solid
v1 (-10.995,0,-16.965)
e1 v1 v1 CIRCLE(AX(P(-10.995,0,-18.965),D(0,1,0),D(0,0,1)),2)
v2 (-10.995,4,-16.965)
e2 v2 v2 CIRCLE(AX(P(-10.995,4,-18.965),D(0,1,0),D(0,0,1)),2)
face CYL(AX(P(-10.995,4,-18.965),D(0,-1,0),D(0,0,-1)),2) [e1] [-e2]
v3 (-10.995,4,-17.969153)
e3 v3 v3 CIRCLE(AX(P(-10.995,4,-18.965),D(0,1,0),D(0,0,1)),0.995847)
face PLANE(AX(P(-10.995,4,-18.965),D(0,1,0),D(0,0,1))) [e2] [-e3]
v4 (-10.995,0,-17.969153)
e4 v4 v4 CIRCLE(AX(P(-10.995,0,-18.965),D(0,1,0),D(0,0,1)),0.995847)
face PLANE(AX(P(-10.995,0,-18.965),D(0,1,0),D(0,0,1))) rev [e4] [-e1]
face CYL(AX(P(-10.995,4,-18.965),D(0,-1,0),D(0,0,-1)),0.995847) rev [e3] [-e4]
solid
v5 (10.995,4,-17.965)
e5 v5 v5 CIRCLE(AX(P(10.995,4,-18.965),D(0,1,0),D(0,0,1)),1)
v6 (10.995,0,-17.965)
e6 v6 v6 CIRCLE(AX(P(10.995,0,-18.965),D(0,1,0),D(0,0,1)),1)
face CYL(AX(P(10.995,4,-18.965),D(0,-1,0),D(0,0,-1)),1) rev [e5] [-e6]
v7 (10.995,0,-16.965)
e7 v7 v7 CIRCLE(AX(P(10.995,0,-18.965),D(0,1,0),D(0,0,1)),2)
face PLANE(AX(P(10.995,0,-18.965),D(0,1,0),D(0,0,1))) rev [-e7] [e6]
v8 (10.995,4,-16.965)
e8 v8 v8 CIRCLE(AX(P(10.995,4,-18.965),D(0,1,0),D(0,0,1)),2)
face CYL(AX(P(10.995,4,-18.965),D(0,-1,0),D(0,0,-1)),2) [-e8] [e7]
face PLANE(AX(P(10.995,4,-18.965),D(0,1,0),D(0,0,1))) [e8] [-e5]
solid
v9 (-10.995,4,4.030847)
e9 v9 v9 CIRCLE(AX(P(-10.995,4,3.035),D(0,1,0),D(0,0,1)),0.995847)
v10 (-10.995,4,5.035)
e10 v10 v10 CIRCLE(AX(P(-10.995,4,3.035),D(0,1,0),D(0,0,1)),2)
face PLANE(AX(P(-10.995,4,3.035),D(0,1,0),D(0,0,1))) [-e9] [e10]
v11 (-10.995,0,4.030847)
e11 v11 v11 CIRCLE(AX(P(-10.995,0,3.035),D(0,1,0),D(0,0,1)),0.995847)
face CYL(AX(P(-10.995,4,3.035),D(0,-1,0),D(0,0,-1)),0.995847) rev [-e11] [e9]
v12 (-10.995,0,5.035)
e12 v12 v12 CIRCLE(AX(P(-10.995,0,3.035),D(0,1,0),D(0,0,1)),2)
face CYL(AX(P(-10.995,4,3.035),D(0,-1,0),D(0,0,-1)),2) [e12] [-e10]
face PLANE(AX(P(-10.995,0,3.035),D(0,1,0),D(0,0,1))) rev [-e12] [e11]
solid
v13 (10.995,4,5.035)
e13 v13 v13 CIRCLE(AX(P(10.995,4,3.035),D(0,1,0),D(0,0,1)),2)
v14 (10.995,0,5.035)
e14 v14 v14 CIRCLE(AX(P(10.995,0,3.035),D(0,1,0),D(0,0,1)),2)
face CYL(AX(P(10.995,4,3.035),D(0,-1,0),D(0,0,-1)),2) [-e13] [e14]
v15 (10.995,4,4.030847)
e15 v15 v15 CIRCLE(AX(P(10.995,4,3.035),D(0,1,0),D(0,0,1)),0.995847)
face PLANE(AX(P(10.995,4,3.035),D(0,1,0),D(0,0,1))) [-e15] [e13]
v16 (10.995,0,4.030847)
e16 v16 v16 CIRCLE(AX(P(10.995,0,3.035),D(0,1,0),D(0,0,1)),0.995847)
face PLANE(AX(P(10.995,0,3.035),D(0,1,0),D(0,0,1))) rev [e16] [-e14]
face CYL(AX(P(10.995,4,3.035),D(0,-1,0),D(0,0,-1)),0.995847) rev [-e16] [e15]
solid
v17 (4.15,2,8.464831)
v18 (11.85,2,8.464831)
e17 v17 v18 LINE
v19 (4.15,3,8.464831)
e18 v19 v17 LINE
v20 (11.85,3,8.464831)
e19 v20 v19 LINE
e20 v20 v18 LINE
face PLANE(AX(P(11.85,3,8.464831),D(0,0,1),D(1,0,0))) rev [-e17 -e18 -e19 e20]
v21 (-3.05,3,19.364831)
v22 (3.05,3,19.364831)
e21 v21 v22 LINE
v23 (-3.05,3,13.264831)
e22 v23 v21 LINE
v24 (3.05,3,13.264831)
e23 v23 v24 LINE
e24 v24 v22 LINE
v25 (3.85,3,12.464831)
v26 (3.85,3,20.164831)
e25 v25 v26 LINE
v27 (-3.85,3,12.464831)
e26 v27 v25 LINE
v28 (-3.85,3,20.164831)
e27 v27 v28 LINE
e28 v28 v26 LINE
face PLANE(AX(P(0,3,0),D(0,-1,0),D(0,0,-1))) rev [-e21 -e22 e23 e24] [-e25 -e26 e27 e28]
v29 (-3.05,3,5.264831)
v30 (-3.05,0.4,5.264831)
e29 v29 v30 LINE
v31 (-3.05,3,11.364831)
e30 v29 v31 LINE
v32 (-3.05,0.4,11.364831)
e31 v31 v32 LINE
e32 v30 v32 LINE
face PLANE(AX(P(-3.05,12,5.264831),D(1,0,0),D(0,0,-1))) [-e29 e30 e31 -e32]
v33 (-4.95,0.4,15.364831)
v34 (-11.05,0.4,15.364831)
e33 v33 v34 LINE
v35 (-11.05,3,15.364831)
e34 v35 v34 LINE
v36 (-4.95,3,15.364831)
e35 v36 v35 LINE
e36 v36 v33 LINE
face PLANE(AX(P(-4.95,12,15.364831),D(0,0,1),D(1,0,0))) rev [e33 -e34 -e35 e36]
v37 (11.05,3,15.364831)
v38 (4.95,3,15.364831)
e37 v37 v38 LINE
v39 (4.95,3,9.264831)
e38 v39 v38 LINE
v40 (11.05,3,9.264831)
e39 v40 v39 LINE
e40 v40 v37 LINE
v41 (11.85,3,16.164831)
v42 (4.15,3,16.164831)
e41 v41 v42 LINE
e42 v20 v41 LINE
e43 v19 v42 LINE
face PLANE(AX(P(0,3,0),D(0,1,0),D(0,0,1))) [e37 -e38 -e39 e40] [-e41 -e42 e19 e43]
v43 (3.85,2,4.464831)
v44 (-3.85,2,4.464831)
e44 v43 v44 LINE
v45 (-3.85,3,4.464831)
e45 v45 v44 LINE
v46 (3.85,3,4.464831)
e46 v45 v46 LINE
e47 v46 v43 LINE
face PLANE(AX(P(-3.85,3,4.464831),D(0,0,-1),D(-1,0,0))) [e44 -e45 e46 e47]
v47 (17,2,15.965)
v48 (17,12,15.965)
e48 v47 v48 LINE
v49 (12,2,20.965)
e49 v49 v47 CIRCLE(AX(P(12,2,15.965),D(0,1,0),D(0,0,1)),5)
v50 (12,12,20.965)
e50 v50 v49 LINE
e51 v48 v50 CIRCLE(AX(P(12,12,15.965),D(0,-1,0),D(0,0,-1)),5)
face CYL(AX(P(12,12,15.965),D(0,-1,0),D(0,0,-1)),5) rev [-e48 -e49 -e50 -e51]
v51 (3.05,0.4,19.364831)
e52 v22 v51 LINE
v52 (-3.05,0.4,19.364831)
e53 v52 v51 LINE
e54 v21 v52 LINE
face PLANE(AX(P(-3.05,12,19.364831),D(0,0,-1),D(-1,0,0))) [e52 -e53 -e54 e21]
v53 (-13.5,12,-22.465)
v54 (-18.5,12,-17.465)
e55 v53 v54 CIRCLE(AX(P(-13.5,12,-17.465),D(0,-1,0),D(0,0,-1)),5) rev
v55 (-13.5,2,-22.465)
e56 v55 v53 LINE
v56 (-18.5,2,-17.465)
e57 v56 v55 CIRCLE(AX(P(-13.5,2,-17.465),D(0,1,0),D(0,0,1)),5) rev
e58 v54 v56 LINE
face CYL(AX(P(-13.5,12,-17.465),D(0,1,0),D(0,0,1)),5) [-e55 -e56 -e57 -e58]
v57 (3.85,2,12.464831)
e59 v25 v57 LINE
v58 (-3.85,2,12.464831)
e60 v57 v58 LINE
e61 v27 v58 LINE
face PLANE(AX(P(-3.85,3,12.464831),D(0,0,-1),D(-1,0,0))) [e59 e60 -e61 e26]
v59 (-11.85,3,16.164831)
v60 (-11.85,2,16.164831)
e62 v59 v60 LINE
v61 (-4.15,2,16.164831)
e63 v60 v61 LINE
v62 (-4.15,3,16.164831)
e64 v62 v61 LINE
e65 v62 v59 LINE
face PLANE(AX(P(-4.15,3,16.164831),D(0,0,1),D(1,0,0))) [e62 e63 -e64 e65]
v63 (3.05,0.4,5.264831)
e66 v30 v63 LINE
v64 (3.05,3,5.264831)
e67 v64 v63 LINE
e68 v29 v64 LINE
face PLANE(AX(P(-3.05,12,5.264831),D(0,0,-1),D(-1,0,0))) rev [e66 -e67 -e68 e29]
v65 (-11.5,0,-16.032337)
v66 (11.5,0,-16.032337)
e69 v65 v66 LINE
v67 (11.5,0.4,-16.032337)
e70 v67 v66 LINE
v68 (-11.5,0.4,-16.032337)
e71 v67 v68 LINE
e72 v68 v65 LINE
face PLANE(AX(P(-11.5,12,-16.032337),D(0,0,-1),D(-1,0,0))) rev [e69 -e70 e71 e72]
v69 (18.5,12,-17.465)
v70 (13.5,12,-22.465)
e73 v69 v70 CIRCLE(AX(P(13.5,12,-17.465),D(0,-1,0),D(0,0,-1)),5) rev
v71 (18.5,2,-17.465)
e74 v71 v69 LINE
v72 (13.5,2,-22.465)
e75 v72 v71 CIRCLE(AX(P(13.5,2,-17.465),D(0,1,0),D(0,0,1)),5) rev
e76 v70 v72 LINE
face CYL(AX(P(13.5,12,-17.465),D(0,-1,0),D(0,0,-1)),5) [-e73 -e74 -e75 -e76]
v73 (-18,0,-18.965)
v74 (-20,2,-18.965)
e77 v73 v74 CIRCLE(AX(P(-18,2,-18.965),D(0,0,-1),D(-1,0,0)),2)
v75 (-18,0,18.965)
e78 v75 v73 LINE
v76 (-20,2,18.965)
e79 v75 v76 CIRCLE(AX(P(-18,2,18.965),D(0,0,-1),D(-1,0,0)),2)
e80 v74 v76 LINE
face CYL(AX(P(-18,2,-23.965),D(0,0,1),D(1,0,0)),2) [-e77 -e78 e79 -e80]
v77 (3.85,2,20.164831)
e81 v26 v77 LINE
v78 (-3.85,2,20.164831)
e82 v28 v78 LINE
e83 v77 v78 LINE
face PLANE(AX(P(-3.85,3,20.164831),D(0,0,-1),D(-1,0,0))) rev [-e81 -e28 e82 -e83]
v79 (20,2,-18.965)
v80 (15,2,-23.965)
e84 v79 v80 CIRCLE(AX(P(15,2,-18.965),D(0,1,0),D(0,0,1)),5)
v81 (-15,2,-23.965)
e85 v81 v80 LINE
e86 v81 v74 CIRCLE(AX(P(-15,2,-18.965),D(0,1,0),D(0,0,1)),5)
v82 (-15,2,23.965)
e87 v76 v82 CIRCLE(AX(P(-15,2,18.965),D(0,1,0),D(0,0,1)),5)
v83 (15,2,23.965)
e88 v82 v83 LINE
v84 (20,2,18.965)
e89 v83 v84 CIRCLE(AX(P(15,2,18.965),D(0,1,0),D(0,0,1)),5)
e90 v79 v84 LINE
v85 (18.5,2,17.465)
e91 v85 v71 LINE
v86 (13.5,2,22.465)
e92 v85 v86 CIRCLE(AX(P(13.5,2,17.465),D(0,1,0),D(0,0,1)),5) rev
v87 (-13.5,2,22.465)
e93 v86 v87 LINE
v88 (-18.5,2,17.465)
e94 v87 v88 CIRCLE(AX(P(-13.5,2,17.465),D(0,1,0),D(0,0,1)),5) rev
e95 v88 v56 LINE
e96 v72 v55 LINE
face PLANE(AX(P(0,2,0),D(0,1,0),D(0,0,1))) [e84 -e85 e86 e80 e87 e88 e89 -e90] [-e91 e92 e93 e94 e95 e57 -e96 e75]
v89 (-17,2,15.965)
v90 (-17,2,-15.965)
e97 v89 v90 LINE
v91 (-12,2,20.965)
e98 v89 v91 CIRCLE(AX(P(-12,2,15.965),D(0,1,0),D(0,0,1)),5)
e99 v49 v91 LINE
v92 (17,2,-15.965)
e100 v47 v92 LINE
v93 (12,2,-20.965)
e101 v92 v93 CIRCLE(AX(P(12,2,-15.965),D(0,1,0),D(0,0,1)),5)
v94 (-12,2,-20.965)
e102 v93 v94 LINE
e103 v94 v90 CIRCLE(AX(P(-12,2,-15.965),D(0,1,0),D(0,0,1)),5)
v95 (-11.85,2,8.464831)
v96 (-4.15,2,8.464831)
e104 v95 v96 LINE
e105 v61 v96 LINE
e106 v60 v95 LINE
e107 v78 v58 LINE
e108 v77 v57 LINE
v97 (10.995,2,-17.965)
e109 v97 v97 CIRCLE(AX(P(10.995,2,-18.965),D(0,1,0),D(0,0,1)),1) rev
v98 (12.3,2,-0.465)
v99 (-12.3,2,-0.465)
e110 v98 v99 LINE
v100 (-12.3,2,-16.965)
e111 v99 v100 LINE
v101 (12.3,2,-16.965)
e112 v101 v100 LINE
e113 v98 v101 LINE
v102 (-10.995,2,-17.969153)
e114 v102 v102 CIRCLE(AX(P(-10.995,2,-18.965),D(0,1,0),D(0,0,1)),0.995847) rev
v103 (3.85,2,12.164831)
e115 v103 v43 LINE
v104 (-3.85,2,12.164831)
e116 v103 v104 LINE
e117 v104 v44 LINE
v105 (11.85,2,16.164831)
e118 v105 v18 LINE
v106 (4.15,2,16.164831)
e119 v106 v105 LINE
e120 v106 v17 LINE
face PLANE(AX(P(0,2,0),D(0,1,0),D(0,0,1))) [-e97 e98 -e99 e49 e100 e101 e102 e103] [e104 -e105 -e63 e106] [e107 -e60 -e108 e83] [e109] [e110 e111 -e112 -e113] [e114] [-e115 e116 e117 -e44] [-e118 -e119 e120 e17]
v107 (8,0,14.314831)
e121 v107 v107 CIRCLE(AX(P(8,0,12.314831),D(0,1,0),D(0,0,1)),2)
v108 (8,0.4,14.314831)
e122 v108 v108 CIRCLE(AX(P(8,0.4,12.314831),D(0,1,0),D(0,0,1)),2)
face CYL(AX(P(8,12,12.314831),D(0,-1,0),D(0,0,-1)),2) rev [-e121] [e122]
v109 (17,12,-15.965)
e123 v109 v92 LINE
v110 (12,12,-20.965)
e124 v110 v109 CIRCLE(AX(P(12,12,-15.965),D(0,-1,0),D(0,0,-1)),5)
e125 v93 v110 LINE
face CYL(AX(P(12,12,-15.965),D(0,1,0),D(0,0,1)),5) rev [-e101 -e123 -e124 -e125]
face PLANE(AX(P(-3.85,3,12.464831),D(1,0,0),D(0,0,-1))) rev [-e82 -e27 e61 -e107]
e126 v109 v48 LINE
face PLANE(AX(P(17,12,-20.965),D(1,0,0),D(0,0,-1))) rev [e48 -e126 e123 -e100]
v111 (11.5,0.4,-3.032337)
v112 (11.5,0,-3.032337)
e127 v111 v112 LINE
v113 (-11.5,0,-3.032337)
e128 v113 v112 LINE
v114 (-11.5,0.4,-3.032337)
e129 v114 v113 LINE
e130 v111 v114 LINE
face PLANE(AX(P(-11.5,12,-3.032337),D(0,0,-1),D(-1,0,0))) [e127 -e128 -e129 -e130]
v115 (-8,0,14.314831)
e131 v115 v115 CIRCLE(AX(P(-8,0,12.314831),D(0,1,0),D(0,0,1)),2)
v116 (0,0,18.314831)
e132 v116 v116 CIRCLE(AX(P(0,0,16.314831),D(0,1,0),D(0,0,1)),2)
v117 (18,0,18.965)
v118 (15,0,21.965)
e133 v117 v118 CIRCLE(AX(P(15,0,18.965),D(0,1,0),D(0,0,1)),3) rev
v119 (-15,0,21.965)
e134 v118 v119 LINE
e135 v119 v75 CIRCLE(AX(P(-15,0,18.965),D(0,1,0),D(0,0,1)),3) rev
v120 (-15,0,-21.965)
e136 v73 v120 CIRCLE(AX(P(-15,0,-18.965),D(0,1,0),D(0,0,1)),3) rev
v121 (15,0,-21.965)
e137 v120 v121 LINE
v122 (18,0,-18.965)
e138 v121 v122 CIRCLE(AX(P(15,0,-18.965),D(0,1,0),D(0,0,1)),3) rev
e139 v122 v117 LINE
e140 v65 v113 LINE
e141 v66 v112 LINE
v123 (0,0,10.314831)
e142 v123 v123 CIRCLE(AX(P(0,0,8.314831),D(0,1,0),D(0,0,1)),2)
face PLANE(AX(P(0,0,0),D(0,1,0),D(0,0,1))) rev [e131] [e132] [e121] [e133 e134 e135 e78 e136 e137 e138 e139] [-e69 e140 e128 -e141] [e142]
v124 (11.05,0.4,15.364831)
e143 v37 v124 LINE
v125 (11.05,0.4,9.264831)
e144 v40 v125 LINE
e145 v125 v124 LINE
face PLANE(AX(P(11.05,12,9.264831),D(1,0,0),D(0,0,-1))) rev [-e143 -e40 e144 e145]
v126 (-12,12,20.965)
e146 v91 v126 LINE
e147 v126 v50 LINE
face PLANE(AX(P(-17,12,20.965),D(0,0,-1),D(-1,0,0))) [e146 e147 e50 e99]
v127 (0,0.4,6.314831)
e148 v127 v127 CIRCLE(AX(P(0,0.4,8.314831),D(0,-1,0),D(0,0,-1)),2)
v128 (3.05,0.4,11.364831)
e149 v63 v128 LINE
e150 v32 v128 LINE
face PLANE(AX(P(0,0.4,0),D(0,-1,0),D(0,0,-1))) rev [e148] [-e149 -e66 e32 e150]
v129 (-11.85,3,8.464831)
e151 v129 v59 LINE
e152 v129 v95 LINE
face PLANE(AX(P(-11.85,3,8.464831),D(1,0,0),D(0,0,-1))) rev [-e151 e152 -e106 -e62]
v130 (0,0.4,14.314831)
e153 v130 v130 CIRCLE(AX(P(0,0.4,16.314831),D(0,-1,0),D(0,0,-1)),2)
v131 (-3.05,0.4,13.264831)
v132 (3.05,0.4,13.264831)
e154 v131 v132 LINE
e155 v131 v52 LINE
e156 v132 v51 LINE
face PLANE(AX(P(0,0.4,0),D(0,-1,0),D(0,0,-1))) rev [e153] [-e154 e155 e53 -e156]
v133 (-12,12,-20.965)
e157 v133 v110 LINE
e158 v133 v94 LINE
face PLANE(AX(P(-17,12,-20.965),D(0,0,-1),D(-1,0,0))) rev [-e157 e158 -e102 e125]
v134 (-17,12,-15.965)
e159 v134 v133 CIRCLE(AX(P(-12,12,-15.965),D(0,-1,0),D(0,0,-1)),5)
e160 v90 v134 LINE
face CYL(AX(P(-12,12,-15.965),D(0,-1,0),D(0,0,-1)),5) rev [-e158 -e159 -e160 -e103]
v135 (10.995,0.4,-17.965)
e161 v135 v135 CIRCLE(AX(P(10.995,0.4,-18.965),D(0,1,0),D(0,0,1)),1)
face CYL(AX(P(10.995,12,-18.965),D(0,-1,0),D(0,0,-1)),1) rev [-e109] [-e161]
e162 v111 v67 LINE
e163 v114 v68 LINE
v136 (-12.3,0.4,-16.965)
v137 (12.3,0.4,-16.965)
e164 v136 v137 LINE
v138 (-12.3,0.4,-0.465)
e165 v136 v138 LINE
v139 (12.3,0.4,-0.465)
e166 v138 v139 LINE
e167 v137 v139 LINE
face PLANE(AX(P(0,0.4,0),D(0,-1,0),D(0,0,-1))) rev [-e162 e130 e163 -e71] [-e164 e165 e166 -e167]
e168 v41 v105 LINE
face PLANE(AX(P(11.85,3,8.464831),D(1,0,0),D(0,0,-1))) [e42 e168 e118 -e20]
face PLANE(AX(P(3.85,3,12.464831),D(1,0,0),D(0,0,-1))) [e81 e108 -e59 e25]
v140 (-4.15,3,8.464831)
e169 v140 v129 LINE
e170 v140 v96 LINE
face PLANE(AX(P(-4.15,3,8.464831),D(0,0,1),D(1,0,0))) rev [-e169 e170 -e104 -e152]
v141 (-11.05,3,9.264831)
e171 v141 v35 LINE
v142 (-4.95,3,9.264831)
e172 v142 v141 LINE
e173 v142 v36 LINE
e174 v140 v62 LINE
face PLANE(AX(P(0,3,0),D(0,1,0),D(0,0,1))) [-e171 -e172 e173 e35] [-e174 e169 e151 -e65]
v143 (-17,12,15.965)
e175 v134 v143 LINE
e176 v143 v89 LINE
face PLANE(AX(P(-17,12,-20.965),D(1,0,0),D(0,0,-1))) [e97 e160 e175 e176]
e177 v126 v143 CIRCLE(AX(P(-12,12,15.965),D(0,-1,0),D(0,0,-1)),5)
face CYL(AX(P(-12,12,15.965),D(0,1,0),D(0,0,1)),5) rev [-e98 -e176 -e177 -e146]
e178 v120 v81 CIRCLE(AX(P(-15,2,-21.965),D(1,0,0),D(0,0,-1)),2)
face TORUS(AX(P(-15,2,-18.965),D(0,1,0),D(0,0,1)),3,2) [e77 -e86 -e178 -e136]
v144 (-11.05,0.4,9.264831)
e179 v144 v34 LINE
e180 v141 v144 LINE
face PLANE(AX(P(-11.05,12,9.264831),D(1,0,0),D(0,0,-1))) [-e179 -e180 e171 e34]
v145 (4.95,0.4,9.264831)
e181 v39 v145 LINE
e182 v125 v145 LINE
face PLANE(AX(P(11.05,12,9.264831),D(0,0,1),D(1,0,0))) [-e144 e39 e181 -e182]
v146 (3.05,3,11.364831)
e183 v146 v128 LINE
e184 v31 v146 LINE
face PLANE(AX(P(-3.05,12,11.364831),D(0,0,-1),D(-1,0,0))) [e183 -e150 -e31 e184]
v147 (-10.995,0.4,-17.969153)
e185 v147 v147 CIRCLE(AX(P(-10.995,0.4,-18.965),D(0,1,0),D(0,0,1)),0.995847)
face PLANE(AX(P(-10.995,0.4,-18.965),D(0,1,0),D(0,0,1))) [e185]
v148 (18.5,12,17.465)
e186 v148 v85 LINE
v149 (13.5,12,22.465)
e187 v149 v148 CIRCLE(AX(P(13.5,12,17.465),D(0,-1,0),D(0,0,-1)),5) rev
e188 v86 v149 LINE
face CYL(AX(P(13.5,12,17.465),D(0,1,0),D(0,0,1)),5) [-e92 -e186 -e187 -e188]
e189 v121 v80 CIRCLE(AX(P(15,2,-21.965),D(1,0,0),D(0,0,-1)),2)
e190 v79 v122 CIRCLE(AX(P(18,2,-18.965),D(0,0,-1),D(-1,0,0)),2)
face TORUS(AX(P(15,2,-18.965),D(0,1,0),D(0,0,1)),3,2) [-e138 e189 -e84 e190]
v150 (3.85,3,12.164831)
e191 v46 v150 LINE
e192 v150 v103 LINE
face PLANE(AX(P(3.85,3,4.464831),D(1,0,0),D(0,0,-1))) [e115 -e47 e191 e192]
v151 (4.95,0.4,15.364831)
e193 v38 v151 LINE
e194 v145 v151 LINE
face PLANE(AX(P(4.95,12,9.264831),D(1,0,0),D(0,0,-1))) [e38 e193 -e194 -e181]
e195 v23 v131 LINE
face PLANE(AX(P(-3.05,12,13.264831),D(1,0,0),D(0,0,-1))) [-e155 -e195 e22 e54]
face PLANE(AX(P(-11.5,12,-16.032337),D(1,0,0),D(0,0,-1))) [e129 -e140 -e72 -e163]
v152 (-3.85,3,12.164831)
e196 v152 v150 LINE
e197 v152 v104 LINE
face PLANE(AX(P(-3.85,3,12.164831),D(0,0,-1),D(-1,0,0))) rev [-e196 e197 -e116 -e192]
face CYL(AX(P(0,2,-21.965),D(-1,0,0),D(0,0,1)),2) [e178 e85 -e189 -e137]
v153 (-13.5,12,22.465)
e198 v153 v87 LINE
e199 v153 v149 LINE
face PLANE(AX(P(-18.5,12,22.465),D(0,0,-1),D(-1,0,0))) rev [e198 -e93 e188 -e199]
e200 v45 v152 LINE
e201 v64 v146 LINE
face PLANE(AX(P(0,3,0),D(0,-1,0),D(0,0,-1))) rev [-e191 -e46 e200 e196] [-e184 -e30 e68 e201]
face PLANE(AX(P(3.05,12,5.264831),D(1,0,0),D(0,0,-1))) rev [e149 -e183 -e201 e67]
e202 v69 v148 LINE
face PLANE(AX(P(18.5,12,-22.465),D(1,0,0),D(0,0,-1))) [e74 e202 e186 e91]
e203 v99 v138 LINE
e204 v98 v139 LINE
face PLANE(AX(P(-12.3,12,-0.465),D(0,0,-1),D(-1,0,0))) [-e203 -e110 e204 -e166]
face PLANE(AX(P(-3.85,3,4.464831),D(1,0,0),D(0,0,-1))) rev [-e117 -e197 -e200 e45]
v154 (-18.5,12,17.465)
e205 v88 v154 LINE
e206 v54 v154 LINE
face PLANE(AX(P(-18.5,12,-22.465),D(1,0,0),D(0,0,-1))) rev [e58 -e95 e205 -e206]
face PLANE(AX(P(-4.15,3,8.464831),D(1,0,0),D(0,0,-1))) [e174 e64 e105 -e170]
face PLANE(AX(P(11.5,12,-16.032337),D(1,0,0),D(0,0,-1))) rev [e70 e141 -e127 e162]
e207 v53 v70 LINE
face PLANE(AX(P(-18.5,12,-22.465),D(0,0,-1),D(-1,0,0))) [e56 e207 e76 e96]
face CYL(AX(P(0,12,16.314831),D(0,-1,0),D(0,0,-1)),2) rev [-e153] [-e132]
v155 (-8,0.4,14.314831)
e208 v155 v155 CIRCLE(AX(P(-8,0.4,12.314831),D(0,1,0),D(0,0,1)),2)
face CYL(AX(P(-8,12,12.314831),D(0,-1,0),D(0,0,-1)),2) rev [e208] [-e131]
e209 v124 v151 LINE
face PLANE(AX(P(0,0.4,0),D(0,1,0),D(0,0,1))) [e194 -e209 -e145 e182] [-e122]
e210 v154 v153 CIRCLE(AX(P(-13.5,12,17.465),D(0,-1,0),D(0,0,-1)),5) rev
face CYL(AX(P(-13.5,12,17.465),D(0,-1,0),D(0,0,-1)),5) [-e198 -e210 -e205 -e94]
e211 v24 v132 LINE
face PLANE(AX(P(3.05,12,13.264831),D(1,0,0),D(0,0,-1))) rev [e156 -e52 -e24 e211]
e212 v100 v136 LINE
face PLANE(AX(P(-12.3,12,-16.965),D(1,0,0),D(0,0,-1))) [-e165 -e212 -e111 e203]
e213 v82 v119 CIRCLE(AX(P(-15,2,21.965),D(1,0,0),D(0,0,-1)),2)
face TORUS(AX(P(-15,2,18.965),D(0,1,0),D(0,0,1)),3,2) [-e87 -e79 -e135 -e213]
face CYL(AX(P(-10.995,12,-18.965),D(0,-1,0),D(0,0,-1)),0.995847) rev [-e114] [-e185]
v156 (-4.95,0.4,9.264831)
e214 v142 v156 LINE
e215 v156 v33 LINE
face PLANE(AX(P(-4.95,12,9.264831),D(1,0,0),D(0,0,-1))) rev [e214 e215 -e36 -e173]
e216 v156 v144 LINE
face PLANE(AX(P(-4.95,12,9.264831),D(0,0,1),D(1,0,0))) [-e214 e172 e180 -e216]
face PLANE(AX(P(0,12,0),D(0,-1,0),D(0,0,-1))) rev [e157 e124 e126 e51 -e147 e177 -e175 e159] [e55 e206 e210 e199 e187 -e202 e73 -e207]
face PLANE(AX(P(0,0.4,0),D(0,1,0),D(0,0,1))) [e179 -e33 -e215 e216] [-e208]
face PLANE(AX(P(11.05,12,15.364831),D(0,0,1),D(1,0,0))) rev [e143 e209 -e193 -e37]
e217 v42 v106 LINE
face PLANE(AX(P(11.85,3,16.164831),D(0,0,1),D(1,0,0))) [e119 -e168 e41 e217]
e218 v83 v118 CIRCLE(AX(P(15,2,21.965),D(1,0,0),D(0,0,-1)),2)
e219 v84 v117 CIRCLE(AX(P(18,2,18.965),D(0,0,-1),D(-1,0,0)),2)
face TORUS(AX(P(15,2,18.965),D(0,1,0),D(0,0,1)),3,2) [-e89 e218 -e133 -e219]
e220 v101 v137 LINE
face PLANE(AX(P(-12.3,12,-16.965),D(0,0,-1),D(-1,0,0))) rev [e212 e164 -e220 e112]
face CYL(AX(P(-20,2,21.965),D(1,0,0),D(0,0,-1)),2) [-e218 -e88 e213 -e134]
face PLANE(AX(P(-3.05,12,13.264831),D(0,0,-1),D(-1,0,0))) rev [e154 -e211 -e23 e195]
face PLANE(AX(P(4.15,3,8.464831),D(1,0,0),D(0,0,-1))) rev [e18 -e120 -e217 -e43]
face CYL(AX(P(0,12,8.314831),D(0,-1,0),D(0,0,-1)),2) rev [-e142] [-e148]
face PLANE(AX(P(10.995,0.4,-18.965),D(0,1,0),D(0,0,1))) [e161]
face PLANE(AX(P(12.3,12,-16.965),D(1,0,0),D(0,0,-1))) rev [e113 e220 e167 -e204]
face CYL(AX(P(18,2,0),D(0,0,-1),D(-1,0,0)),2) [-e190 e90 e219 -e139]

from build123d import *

# Parameters (mm, degrees)
SCHIZZO1_W                     = 40
SCHIZZO1_H                     = 47.93
ESTRUSIONE_ESTRUSIONE1_DEPTH   = 2
SCHIZZO1_3_W                   = 37
SCHIZZO1_3_H                   = 44.93
SCHIZZO1_3_W_2                 = 34
SCHIZZO1_3_H_2                 = 41.93
ESTRUSIONE_ESTRUSIONE2_DEPTH   = 12
RACCORDO1_R                    = 5
RACCORDO2_R                    = 2
TAGLIO_ESTRUSIONE1_DEPTH       = 34.441310157
TAGLIO_ESTRUSIONE1_DEPTH_BACK  = 34.441310157
SCHIZZO2_R                     = 2
SCHIZZO2_W                     = 23
SCHIZZO2_H                     = 13
TAGLIO_ESTRUSIONE2_START       = 0.4
SCHIZZO3_R                     = 0.995847047
SCHIZZO3_R_2                   = 1
SCHIZZO3_W                     = 24.6
SCHIZZO3_H                     = 16.5
TAGLIO_ESTRUSIONE2_DEPTH       = 34.041310157
SCHIZZO3_3_R                   = 2
SCHIZZO3_3_R_2                 = 0.995847047
ESTRUSIONE_ESTRUSIONE3_DEPTH   = 4
SCHIZZO3_3_R_3                 = 1
ESTRUSIONE_ESTRUSIONE3_2_DEPTH = 4
ESTRUSIONE_ESTRUSIONE3_3_DEPTH = 4
ESTRUSIONE_ESTRUSIONE3_4_DEPTH = 4
TAGLIO_ESTRUSIONE3_START       = 0.4
SCHIZZO2_5_W                   = 6.1
SCHIZZO2_5_H                   = 6.1
TAGLIO_ESTRUSIONE3_DEPTH       = 34.041310157
SCHIZZO2_6_W                   = 7.7
SCHIZZO2_6_H                   = 7.7
SCHIZZO2_6_W_2                 = 6.1
SCHIZZO2_6_H_2                 = 6.1
ESTRUSIONE_ESTRUSIONE4_DEPTH   = 3


with BuildPart() as part:
    # Schizzo1 → Estrusione-Estrusione1 (new body)
    with BuildSketch(Plane(origin=(0, 0, 0), x_dir=(1, 0, 0), z_dir=(0, 1, 0))):
        Rectangle(SCHIZZO1_W, SCHIZZO1_H)
    extrude(amount=ESTRUSIONE_ESTRUSIONE1_DEPTH)

    # Schizzo1<3> → Estrusione-Estrusione2 (add)
    with BuildSketch(Plane(origin=(0, 0, 0), x_dir=(1, 0, 0), z_dir=(0, 1, 0))):
        Rectangle(SCHIZZO1_3_W, SCHIZZO1_3_H)
        Rectangle(SCHIZZO1_3_W_2, SCHIZZO1_3_H_2, mode=Mode.SUBTRACT)
    extrude(amount=ESTRUSIONE_ESTRUSIONE2_DEPTH)

    # Raccordo1
    raccordo1_edges = [part.edges().sort_by_distance(p)[0] for p in [
        (18.5, 7, -22.465),
        (-18.5, 7, -22.465),
        (-18.5, 7, 22.465),
        (18.5, 7, 22.465),
        (-17, 7, -20.965),
        (-17, 7, 20.965),
        (17, 7, 20.965),
        (17, 7, -20.965),
        (-20, 1, -23.965),
        (20, 1, -23.965),
        (20, 1, 23.965),
        (-20, 1, 23.965),
    ]]
    fillet(raccordo1_edges, radius=RACCORDO1_R)

    # Raccordo2
    raccordo2_edges = [part.edges().sort_by_distance(p)[0] for p in [
        (18.535533906, 0, -22.500533906),
        (0, 0, -23.965),
        (-18.535533906, 0, -22.500533906),
        (-20, 0, 0),
        (-18.535533906, 0, 22.500533906),
        (0, 0, 23.965),
        (18.535533906, 0, 22.500533906),
        (20, 0, 0),
    ]]
    fillet(raccordo2_edges, radius=RACCORDO2_R - 0.0001)  # a hair under: the kernel refuses the full size

    # Schizzo2 → Taglio-Estrusione1 (cut, two sides: drawn at the far end of the back side and taken through both)
    with BuildSketch(Plane(origin=(0, 0, 0), x_dir=(1, 0, 0), z_dir=(0, 1, 0)).offset(-TAGLIO_ESTRUSIONE1_DEPTH_BACK)):
        with Locations(Location((0, -8.314831285, 0), (0, 0, 270))):
            Circle(SCHIZZO2_R)
        with Locations(Location((8, -12.314831285, 0), (0, 0, 270))):
            Circle(SCHIZZO2_R)
        with Locations(Location((0, -16.314831285, 0), (0, 0, 270))):
            Circle(SCHIZZO2_R)
        with Locations(Location((-8, -12.314831285, 0), (0, 0, 270))):
            Circle(SCHIZZO2_R)
        with Locations((0, 9.532336944)):
            Rectangle(SCHIZZO2_W, SCHIZZO2_H)
    extrude(amount=TAGLIO_ESTRUSIONE1_DEPTH + TAGLIO_ESTRUSIONE1_DEPTH_BACK, mode=Mode.SUBTRACT)

    # Schizzo3 → Taglio-Estrusione2 (cut, through all)
    with BuildSketch(Plane(origin=(0, 0, 0), x_dir=(1, 0, 0), z_dir=(0, 1, 0)).offset(TAGLIO_ESTRUSIONE2_START)):
        with Locations(Location((-10.995, 18.965, 0), (0, 0, 270))):
            Circle(SCHIZZO3_R)
        with Locations(Location((10.995, 18.965, 0), (0, 0, 270))):
            Circle(SCHIZZO3_R_2)
        with Locations((0, 8.715)):
            Rectangle(SCHIZZO3_W, SCHIZZO3_H)
    extrude(amount=TAGLIO_ESTRUSIONE2_DEPTH, mode=Mode.SUBTRACT)

    # Schizzo2<5> → Taglio-Estrusione3 (cut, through all)
    with BuildSketch(Plane(origin=(0, 0, 0), x_dir=(1, 0, 0), z_dir=(0, 1, 0)).offset(TAGLIO_ESTRUSIONE3_START)):
        with Locations((0, -8.314831285)):
            Rectangle(SCHIZZO2_5_W, SCHIZZO2_5_H)
        with Locations((8, -12.314831285)):
            Rectangle(SCHIZZO2_5_W, SCHIZZO2_5_H)
        with Locations((0, -16.314831285)):
            Rectangle(SCHIZZO2_5_W, SCHIZZO2_5_H)
        with Locations((-8, -12.314831285)):
            Rectangle(SCHIZZO2_5_W, SCHIZZO2_5_H)
    extrude(amount=TAGLIO_ESTRUSIONE3_DEPTH, mode=Mode.SUBTRACT)

    # Schizzo2<6> → Estrusione-Estrusione4 (add)
    # profile 1 of 4: a face of its own
    with BuildSketch(Plane(origin=(0, 0, 0), x_dir=(1, 0, 0), z_dir=(0, 1, 0))):
        with Locations((0, -8.314831285)):
            Rectangle(SCHIZZO2_6_W, SCHIZZO2_6_H)
        with Locations((0, -8.314831285)):
            Rectangle(SCHIZZO2_6_W_2, SCHIZZO2_6_H_2, mode=Mode.SUBTRACT)
    # profile 2 of 4: a face of its own
    with BuildSketch(Plane(origin=(0, 0, 0), x_dir=(1, 0, 0), z_dir=(0, 1, 0))):
        with Locations((8, -12.314831285)):
            Rectangle(SCHIZZO2_6_W, SCHIZZO2_6_H)
        with Locations((8, -12.314831285)):
            Rectangle(SCHIZZO2_6_W_2, SCHIZZO2_6_H_2, mode=Mode.SUBTRACT)
    # profile 3 of 4: a face of its own
    with BuildSketch(Plane(origin=(0, 0, 0), x_dir=(1, 0, 0), z_dir=(0, 1, 0))):
        with Locations((0, -16.314831285)):
            Rectangle(SCHIZZO2_6_W, SCHIZZO2_6_H)
        with Locations((0, -16.314831285)):
            Rectangle(SCHIZZO2_6_W_2, SCHIZZO2_6_H_2, mode=Mode.SUBTRACT)
    # profile 4 of 4: a face of its own
    with BuildSketch(Plane(origin=(0, 0, 0), x_dir=(1, 0, 0), z_dir=(0, 1, 0))):
        with Locations((-8, -12.314831285)):
            Rectangle(SCHIZZO2_6_W, SCHIZZO2_6_H)
        with Locations((-8, -12.314831285)):
            Rectangle(SCHIZZO2_6_W_2, SCHIZZO2_6_H_2, mode=Mode.SUBTRACT)
    extrude(amount=ESTRUSIONE_ESTRUSIONE4_DEPTH)


with BuildPart() as body_2:
    # Schizzo3<3> → Estrusione-Estrusione3 (new body)
    with BuildSketch(Plane(origin=(0, 0, 0), x_dir=(1, 0, 0), z_dir=(0, 1, 0))):
        with Locations(Location((-10.995, 18.965, 0), (0, 0, 270))):
            Circle(SCHIZZO3_3_R)
        with Locations(Location((-10.995, 18.965, 0), (0, 0, 270))):
            Circle(SCHIZZO3_3_R_2, mode=Mode.SUBTRACT)
    extrude(amount=ESTRUSIONE_ESTRUSIONE3_DEPTH)


with BuildPart() as body_3:
    # Schizzo3<3> → Estrusione-Estrusione3 2 (new body)
    with BuildSketch(Plane(origin=(0, 0, 0), x_dir=(1, 0, 0), z_dir=(0, 1, 0))):
        with Locations(Location((10.995, 18.965, 0), (0, 0, 270))):
            Circle(SCHIZZO3_3_R)
        with Locations(Location((10.995, 18.965, 0), (0, 0, 270))):
            Circle(SCHIZZO3_3_R_3, mode=Mode.SUBTRACT)
    extrude(amount=ESTRUSIONE_ESTRUSIONE3_2_DEPTH)


with BuildPart() as body_4:
    # Schizzo3<3> → Estrusione-Estrusione3 3 (new body)
    with BuildSketch(Plane(origin=(0, 0, 0), x_dir=(1, 0, 0), z_dir=(0, 1, 0))):
        with Locations(Location((-10.995, -3.035, 0), (0, 0, 270))):
            Circle(SCHIZZO3_3_R)
        with Locations(Location((-10.995, -3.035, 0), (0, 0, 270))):
            Circle(SCHIZZO3_3_R_2, mode=Mode.SUBTRACT)
    extrude(amount=ESTRUSIONE_ESTRUSIONE3_3_DEPTH)


with BuildPart() as body_5:
    # Schizzo3<3> → Estrusione-Estrusione3 4 (new body)
    with BuildSketch(Plane(origin=(0, 0, 0), x_dir=(1, 0, 0), z_dir=(0, 1, 0))):
        with Locations(Location((10.995, -3.035, 0), (0, 0, 270))):
            Circle(SCHIZZO3_3_R)
        with Locations(Location((10.995, -3.035, 0), (0, 0, 270))):
            Circle(SCHIZZO3_3_R_2, mode=Mode.SUBTRACT)
    extrude(amount=ESTRUSIONE_ESTRUSIONE3_4_DEPTH)


solid = Compound([part.part, body_2.part, body_3.part, body_4.part, body_5.part])
